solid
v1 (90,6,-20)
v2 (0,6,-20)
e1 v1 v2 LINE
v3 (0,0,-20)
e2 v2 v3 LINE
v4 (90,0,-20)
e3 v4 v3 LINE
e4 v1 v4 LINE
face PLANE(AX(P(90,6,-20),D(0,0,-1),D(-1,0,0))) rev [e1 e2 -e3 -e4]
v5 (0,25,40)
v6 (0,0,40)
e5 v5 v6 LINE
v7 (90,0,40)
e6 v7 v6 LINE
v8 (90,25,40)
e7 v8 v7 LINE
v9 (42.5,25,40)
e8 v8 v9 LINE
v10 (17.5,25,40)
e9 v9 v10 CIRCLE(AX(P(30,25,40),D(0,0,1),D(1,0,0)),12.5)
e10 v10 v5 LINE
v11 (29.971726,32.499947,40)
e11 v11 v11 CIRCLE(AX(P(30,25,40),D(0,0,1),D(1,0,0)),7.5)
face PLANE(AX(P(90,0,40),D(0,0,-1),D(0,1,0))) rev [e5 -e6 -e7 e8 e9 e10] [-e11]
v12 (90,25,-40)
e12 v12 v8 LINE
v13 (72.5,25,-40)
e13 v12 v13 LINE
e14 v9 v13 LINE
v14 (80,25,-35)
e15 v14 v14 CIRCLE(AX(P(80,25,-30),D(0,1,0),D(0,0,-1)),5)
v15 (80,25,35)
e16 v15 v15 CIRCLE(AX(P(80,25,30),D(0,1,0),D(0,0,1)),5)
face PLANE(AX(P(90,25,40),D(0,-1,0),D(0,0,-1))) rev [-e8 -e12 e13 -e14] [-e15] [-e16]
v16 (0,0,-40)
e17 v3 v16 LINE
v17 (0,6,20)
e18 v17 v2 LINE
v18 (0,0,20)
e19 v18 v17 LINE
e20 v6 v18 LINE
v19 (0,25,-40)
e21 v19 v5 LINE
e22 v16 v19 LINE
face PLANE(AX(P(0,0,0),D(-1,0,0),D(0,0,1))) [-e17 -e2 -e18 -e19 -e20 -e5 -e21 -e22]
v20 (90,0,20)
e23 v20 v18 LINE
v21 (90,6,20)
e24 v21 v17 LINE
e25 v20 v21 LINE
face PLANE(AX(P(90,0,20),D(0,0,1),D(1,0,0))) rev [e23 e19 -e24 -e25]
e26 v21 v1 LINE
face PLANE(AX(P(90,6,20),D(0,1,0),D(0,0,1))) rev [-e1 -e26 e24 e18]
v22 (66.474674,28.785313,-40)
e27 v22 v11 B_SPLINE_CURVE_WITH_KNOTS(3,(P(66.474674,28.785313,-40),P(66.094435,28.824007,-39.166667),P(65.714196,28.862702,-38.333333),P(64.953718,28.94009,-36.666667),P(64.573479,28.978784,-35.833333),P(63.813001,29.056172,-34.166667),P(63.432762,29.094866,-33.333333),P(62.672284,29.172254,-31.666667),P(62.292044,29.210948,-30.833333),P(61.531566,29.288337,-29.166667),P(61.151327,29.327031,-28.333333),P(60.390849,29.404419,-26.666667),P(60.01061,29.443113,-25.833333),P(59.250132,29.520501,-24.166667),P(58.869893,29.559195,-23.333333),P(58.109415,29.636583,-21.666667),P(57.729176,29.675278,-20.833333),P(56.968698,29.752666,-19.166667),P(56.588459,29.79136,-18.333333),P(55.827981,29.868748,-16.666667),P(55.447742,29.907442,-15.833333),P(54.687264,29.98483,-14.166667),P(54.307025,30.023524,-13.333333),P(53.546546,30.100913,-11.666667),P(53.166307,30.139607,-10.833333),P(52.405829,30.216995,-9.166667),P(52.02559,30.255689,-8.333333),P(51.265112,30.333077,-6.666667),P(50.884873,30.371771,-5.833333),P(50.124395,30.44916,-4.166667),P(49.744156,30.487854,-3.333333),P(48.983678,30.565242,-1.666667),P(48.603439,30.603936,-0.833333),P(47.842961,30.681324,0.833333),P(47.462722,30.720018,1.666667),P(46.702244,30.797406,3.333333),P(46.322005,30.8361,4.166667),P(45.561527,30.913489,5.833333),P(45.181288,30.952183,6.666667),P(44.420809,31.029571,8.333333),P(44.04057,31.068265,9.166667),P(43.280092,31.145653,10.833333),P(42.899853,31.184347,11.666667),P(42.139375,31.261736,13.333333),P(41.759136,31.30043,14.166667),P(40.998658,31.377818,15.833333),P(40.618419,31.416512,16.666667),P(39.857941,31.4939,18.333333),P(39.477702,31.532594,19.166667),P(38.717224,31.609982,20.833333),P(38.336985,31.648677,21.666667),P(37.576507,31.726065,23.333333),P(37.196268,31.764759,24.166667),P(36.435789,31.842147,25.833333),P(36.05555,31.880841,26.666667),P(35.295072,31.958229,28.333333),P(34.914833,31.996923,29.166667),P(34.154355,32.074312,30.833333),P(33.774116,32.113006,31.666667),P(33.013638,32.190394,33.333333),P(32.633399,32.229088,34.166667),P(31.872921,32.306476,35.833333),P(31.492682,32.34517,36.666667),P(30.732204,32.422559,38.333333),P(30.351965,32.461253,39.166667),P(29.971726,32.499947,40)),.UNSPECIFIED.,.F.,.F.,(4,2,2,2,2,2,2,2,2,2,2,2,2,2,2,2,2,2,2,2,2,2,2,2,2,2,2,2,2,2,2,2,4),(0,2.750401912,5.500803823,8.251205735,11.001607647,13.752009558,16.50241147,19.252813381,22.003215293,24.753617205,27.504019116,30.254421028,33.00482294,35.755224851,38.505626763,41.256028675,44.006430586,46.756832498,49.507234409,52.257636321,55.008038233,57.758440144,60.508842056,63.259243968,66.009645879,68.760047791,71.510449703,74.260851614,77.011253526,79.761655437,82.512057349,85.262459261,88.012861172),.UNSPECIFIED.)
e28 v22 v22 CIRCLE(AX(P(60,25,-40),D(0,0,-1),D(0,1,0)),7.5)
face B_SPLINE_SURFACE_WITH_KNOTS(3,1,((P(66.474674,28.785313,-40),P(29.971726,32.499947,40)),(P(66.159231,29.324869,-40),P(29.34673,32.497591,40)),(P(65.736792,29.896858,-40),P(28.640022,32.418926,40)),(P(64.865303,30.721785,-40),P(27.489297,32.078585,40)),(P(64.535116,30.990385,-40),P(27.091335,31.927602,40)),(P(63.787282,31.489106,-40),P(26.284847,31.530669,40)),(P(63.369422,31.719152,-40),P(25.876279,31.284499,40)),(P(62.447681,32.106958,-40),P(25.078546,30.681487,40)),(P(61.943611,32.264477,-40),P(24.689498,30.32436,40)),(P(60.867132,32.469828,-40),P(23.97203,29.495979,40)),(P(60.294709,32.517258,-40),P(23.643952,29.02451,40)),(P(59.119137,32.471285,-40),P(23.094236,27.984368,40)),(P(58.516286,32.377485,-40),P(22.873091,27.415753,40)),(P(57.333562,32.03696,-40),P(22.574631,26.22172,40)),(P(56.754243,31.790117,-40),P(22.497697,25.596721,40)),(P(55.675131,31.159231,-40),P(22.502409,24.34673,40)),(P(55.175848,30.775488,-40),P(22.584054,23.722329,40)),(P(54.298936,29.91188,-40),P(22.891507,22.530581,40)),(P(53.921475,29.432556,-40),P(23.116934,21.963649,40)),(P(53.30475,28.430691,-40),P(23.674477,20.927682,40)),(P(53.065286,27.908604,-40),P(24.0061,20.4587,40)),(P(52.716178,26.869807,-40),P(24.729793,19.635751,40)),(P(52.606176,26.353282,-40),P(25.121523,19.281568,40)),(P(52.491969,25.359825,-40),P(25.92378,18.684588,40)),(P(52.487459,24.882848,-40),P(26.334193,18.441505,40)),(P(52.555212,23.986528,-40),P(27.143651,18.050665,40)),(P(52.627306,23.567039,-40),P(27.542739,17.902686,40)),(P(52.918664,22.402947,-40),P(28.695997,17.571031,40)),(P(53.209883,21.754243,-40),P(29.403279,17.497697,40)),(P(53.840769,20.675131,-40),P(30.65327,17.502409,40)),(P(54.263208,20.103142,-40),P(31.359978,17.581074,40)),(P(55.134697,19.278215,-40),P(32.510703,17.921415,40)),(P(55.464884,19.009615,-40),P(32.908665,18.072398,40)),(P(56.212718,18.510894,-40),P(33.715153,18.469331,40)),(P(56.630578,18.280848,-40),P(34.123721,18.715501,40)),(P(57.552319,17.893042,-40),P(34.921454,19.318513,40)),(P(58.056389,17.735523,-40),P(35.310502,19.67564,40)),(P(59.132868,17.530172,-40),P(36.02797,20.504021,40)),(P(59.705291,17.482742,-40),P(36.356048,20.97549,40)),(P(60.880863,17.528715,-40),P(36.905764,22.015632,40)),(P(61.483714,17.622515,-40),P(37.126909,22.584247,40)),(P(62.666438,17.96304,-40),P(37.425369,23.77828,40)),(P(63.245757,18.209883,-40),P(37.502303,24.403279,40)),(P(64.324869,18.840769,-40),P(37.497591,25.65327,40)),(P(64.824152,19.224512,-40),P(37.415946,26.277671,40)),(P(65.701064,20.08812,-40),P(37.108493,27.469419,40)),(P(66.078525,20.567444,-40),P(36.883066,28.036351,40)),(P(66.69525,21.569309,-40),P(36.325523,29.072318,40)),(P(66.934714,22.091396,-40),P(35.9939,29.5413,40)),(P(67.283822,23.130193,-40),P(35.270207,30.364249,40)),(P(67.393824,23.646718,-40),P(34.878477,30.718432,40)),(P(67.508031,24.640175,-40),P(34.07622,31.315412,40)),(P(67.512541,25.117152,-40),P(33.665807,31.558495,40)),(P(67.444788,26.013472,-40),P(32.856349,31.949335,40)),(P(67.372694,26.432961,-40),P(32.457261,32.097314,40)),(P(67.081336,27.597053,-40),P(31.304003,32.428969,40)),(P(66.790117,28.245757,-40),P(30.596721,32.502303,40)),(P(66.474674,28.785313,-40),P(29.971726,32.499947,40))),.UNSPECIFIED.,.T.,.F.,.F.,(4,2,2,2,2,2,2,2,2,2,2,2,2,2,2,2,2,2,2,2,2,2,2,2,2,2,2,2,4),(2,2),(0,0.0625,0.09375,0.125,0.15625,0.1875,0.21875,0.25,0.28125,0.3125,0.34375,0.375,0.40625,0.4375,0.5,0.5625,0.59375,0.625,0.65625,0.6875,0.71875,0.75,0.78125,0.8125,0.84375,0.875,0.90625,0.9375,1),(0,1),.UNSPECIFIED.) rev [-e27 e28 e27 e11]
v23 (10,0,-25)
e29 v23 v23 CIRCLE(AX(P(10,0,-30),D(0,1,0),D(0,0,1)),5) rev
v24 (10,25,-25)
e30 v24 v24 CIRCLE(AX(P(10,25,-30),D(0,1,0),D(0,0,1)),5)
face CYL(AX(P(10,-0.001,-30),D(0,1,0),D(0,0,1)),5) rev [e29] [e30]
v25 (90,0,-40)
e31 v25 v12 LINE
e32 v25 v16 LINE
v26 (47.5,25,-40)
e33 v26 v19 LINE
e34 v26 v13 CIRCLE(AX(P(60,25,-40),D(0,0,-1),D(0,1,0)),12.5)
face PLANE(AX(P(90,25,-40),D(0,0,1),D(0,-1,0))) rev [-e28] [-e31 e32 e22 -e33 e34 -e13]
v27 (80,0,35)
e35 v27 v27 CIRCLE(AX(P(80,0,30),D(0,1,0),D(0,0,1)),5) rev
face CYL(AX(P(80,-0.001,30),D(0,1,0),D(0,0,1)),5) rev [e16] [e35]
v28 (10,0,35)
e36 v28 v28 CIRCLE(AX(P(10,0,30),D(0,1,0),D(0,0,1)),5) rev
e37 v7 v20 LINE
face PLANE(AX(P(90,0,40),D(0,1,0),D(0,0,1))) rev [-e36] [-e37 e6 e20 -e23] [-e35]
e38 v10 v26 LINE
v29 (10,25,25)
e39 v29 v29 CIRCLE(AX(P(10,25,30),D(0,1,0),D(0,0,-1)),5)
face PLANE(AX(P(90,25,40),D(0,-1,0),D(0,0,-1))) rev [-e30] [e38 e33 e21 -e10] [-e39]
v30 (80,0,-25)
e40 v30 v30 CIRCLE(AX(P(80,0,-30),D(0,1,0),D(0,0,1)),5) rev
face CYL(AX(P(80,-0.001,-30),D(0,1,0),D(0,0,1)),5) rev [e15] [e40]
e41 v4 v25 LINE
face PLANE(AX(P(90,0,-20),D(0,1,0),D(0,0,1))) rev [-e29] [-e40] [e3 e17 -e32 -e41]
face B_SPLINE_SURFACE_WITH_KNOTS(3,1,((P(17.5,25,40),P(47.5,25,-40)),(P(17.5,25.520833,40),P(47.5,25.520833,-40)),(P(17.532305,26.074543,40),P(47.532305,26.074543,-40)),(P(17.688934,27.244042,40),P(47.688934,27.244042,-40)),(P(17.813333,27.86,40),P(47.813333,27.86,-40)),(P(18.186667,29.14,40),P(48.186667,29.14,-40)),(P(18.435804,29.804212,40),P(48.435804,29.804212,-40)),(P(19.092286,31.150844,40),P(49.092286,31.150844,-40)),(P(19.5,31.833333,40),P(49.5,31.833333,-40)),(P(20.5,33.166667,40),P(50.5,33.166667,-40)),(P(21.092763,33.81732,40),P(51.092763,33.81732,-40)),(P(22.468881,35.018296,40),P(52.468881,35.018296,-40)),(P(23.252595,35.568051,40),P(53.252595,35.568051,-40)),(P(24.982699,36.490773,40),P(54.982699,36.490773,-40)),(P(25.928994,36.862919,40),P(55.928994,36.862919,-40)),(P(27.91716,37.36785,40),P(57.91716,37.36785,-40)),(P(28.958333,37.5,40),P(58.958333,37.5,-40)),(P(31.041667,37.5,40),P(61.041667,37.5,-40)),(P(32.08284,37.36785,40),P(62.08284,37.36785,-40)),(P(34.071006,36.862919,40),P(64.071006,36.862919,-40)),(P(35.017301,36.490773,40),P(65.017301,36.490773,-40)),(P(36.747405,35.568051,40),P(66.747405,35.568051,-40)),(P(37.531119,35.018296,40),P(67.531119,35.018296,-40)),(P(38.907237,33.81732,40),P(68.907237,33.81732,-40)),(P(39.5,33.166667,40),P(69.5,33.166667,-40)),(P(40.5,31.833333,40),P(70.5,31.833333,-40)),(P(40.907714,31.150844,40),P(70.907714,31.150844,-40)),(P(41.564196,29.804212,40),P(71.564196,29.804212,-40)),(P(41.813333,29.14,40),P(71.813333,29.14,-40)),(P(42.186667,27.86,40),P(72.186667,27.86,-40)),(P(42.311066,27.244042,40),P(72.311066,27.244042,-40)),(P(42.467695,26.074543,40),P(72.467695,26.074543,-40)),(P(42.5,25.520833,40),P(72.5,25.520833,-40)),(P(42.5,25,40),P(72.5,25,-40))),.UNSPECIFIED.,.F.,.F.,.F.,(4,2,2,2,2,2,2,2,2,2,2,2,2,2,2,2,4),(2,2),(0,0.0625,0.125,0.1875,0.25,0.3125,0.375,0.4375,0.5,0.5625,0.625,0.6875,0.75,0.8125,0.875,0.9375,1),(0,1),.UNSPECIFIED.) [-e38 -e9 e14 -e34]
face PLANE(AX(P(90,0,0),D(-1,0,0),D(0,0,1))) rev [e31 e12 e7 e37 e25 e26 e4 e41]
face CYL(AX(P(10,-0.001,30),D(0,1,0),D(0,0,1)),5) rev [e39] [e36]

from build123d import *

# Parameters (mm, degrees)
SALIENTE_EXTRUIR1_DEPTH = 90
CORTAR_EXTRUIR1_REACH   = 103.612
CROQUIS2_R              = 5


with BuildPart() as part:
    # Croquis1 → Saliente-Extruir1 (new body)
    with BuildSketch(Plane(origin=(0, 0, 0), x_dir=(0, 0, -1), z_dir=(1, 0, 0))):
        Polygon((-40, 0), (-20, 0), (-20, 6), (20, 6), (20, 0), (40, 0), (40, 25), (-40, 25), align=None)
    extrude(amount=SALIENTE_EXTRUIR1_DEPTH)

    # Croquis2 → Cortar-Extruir1 (cut, up to next)
    with BuildSketch(Plane(origin=(0, 25, 0), x_dir=(1, 0, 0), z_dir=(0, 1, 0)), mode=Mode.PRIVATE) as cortar_extruir1_sk1:
        with Locations(Location((80, -30, 0), (0, 0, 270))):
            Circle(CROQUIS2_R)
    cortar_extruir1_tool1 = extrude(cortar_extruir1_sk1.sketch, amount=-CORTAR_EXTRUIR1_REACH, mode=Mode.PRIVATE) & part.part
    # Croquis2 → Cortar-Extruir1 (cut, up to next)
    with BuildSketch(Plane(origin=(0, 25, 0), x_dir=(1, 0, 0), z_dir=(0, 1, 0)), mode=Mode.PRIVATE) as cortar_extruir1_sk2:
        with Locations(Location((10, -30, 0), (0, 0, 270))):
            Circle(CROQUIS2_R)
    cortar_extruir1_tool2 = extrude(cortar_extruir1_sk2.sketch, amount=-CORTAR_EXTRUIR1_REACH, mode=Mode.PRIVATE) & part.part
    # Croquis2 → Cortar-Extruir1 (cut, up to next)
    with BuildSketch(Plane(origin=(0, 25, 0), x_dir=(1, 0, 0), z_dir=(0, 1, 0)), mode=Mode.PRIVATE) as cortar_extruir1_sk3:
        with Locations(Location((80, 30, 0), (0, 0, 270))):
            Circle(CROQUIS2_R)
    cortar_extruir1_tool3 = extrude(cortar_extruir1_sk3.sketch, amount=-CORTAR_EXTRUIR1_REACH, mode=Mode.PRIVATE) & part.part
    # Croquis2 → Cortar-Extruir1 (cut, up to next)
    with BuildSketch(Plane(origin=(0, 25, 0), x_dir=(1, 0, 0), z_dir=(0, 1, 0)), mode=Mode.PRIVATE) as cortar_extruir1_sk4:
        with Locations(Location((10, 30, 0), (0, 0, 270))):
            Circle(CROQUIS2_R)
    cortar_extruir1_tool4 = extrude(cortar_extruir1_sk4.sketch, amount=-CORTAR_EXTRUIR1_REACH, mode=Mode.PRIVATE) & part.part
    add(cortar_extruir1_tool1.solids().sort_by_distance((80, 25, 30))[0], mode=Mode.SUBTRACT)
    add(cortar_extruir1_tool2.solids().sort_by_distance((10, 25, 30))[0], mode=Mode.SUBTRACT)
    add(cortar_extruir1_tool3.solids().sort_by_distance((80, 25, -30))[0], mode=Mode.SUBTRACT)
    add(cortar_extruir1_tool4.solids().sort_by_distance((10, 25, -30))[0], mode=Mode.SUBTRACT)

    # Croquis4 → Recubrir4 section 0
    with BuildSketch(Plane.XY.offset(40)):
        with BuildLine():
            Line((17.5, 25), (42.5, 25))
            ThreePointArc((42.5, 25), (30, 37.5), (17.5, 25))
        make_face()
    # Croquis3 → Recubrir4 section 1
    with BuildSketch(Plane(origin=(0, 0, -40), x_dir=(-1, 0, 0), z_dir=(0, 0, -1))):
        with BuildLine():
            Line((-72.5, 25), (-47.5, 25))
            ThreePointArc((-47.5, 25), (-60, 37.5), (-72.5, 25))
        make_face()
    loft()

    # Cortar-Recubrir1: read off the stored shape, not the designer's step
    # Cortar-Recubrir1: loft between two sections, ruled curve by curve
    cortar_recubrir1_from = [
        Edge.make_bspline([(66.474673977, 28.785313314, -40), (66.159231201, 29.324869479, -40), (65.736792303, 29.896857571, -40), (64.865302784, 30.721785457, -40), (64.535116198, 30.990385277, -40), (63.787281531, 31.48910574, -40), (63.369421529, 31.719151625, -40), (62.447680858, 32.106958451, -40), (61.943610916, 32.26447662, -40), (60.867132061, 32.469827705, -40), (60.294709068, 32.517257966, -40), (59.119137062, 32.471285113, -40), (58.516285627, 32.377485336, -40), (57.333561907, 32.036960006, -40), (56.754242851, 31.790116754, -40), (55.675130521, 31.159231201, -40), (55.17584807, 30.775487545, -40), (54.298935855, 29.911880072, -40), (53.921474907, 29.432556086, -40), (53.304749619, 28.430691343, -40), (53.065285592, 27.908604481, -40), (52.716177882, 26.869807291, -40), (52.606176412, 26.353282213, -40), (52.491969247, 25.359825257, -40), (52.487459152, 24.882847533, -40), (52.555211917, 23.986528197, -40), (52.627305677, 23.567038585, -40), (52.918664408, 22.402946626, -40), (53.209883246, 21.754242851, -40), (53.840768799, 20.675130521, -40), (54.263207697, 20.103142429, -40), (55.134697216, 19.278214543, -40), (55.464883802, 19.009614723, -40), (56.212718469, 18.51089426, -40), (56.630578471, 18.280848375, -40), (57.552319142, 17.893041549, -40), (58.056389084, 17.73552338, -40), (59.132867939, 17.530172295, -40), (59.705290932, 17.482742034, -40), (60.880862938, 17.528714887, -40), (61.483714373, 17.622514664, -40), (62.666438093, 17.963039994, -40), (63.245757149, 18.209883246, -40), (64.324869479, 18.840768799, -40), (64.82415193, 19.224512455, -40), (65.701064145, 20.088119928, -40), (66.078525093, 20.567443914, -40), (66.695250381, 21.569308657, -40), (66.934714408, 22.091395519, -40), (67.283822118, 23.130192709, -40), (67.393823588, 23.646717787, -40), (67.508030753, 24.640174743, -40), (67.512540848, 25.117152467, -40), (67.444788083, 26.013471803, -40), (67.372694323, 26.432961415, -40), (67.081335592, 27.597053374, -40), (66.790116754, 28.245757149, -40), (66.474673977, 28.785313314, -40)], [0, 0, 0, 0, 0.0625, 0.0625, 0.09375, 0.09375, 0.125, 0.125, 0.15625, 0.15625, 0.1875, 0.1875, 0.21875, 0.21875, 0.25, 0.25, 0.28125, 0.28125, 0.3125, 0.3125, 0.34375, 0.34375, 0.375, 0.375, 0.40625, 0.40625, 0.4375, 0.4375, 0.5, 0.5, 0.5625, 0.5625, 0.59375, 0.59375, 0.625, 0.625, 0.65625, 0.65625, 0.6875, 0.6875, 0.71875, 0.71875, 0.75, 0.75, 0.78125, 0.78125, 0.8125, 0.8125, 0.84375, 0.84375, 0.875, 0.875, 0.90625, 0.90625, 0.9375, 0.9375, 1, 1, 1, 1], 3),
    ]
    cortar_recubrir1_to = [
        Edge.make_bspline([(29.971725733, 32.499946704, 40), (29.346730174, 32.497590515, 40), (28.640021711, 32.418925734, 40), (27.489296584, 32.078585195, 40), (27.091335491, 31.927601711, 40), (26.284847367, 31.530668849, 40), (25.876278751, 31.284498632, 40), (25.078546377, 30.681486974, 40), (24.689497752, 30.324360039, 40), (23.972030096, 29.495978512, 40), (23.643952375, 29.024509827, 40), (23.094236484, 27.984367777, 40), (22.873090724, 27.415752966, 40), (22.574631411, 26.22171991, 40), (22.497697107, 25.596721292, 40), (22.502409485, 24.346730174, 40), (22.584053936, 23.722329387, 40), (22.891507477, 22.53058058, 40), (23.116934166, 21.963649315, 40), (23.674476843, 20.927681551, 40), (24.006099995, 20.458699891, 40), (24.729793048, 19.635751438, 40), (25.121523263, 19.281567984, 40), (25.923779519, 18.684588169, 40), (26.334192585, 18.441505455, 40), (27.143650559, 18.050664595, 40), (27.542738719, 17.902685931, 40), (28.69599722, 17.571031246, 40), (29.403278708, 17.497697107, 40), (30.653269826, 17.502409485, 40), (31.359978289, 17.581074266, 40), (32.510703416, 17.921414805, 40), (32.908664509, 18.072398289, 40), (33.715152633, 18.469331151, 40), (34.123721249, 18.715501368, 40), (34.921453623, 19.318513026, 40), (35.310502248, 19.675639961, 40), (36.027969904, 20.504021488, 40), (36.356047625, 20.975490173, 40), (36.905763516, 22.015632223, 40), (37.126909276, 22.584247034, 40), (37.425368589, 23.77828009, 40), (37.502302893, 24.403278708, 40), (37.497590515, 25.653269826, 40), (37.415946064, 26.277670613, 40), (37.108492523, 27.46941942, 40), (36.883065834, 28.036350685, 40), (36.325523157, 29.072318449, 40), (35.993900005, 29.541300109, 40), (35.270206952, 30.364248562, 40), (34.878476737, 30.718432016, 40), (34.076220481, 31.315411831, 40), (33.665807415, 31.558494545, 40), (32.856349441, 31.949335405, 40), (32.457261281, 32.097314069, 40), (31.30400278, 32.428968754, 40), (30.596721292, 32.502302893, 40), (29.971725733, 32.499946704, 40)], [0, 0, 0, 0, 0.0625, 0.0625, 0.09375, 0.09375, 0.125, 0.125, 0.15625, 0.15625, 0.1875, 0.1875, 0.21875, 0.21875, 0.25, 0.25, 0.28125, 0.28125, 0.3125, 0.3125, 0.34375, 0.34375, 0.375, 0.375, 0.40625, 0.40625, 0.4375, 0.4375, 0.5, 0.5, 0.5625, 0.5625, 0.59375, 0.59375, 0.625, 0.625, 0.65625, 0.65625, 0.6875, 0.6875, 0.71875, 0.71875, 0.75, 0.75, 0.78125, 0.78125, 0.8125, 0.8125, 0.84375, 0.84375, 0.875, 0.875, 0.90625, 0.90625, 0.9375, 0.9375, 1, 1, 1, 1], 3),
    ]
    cortar_recubrir1 = Solid(Shell([*[Face.make_surface_from_curves(cortar_recubrir1_from[k], cortar_recubrir1_to[k]) for k in range(1)], Face(Wire(cortar_recubrir1_from)), Face(Wire(cortar_recubrir1_to))]))
    add(cortar_recubrir1, mode=Mode.SUBTRACT)


solid = part.part
